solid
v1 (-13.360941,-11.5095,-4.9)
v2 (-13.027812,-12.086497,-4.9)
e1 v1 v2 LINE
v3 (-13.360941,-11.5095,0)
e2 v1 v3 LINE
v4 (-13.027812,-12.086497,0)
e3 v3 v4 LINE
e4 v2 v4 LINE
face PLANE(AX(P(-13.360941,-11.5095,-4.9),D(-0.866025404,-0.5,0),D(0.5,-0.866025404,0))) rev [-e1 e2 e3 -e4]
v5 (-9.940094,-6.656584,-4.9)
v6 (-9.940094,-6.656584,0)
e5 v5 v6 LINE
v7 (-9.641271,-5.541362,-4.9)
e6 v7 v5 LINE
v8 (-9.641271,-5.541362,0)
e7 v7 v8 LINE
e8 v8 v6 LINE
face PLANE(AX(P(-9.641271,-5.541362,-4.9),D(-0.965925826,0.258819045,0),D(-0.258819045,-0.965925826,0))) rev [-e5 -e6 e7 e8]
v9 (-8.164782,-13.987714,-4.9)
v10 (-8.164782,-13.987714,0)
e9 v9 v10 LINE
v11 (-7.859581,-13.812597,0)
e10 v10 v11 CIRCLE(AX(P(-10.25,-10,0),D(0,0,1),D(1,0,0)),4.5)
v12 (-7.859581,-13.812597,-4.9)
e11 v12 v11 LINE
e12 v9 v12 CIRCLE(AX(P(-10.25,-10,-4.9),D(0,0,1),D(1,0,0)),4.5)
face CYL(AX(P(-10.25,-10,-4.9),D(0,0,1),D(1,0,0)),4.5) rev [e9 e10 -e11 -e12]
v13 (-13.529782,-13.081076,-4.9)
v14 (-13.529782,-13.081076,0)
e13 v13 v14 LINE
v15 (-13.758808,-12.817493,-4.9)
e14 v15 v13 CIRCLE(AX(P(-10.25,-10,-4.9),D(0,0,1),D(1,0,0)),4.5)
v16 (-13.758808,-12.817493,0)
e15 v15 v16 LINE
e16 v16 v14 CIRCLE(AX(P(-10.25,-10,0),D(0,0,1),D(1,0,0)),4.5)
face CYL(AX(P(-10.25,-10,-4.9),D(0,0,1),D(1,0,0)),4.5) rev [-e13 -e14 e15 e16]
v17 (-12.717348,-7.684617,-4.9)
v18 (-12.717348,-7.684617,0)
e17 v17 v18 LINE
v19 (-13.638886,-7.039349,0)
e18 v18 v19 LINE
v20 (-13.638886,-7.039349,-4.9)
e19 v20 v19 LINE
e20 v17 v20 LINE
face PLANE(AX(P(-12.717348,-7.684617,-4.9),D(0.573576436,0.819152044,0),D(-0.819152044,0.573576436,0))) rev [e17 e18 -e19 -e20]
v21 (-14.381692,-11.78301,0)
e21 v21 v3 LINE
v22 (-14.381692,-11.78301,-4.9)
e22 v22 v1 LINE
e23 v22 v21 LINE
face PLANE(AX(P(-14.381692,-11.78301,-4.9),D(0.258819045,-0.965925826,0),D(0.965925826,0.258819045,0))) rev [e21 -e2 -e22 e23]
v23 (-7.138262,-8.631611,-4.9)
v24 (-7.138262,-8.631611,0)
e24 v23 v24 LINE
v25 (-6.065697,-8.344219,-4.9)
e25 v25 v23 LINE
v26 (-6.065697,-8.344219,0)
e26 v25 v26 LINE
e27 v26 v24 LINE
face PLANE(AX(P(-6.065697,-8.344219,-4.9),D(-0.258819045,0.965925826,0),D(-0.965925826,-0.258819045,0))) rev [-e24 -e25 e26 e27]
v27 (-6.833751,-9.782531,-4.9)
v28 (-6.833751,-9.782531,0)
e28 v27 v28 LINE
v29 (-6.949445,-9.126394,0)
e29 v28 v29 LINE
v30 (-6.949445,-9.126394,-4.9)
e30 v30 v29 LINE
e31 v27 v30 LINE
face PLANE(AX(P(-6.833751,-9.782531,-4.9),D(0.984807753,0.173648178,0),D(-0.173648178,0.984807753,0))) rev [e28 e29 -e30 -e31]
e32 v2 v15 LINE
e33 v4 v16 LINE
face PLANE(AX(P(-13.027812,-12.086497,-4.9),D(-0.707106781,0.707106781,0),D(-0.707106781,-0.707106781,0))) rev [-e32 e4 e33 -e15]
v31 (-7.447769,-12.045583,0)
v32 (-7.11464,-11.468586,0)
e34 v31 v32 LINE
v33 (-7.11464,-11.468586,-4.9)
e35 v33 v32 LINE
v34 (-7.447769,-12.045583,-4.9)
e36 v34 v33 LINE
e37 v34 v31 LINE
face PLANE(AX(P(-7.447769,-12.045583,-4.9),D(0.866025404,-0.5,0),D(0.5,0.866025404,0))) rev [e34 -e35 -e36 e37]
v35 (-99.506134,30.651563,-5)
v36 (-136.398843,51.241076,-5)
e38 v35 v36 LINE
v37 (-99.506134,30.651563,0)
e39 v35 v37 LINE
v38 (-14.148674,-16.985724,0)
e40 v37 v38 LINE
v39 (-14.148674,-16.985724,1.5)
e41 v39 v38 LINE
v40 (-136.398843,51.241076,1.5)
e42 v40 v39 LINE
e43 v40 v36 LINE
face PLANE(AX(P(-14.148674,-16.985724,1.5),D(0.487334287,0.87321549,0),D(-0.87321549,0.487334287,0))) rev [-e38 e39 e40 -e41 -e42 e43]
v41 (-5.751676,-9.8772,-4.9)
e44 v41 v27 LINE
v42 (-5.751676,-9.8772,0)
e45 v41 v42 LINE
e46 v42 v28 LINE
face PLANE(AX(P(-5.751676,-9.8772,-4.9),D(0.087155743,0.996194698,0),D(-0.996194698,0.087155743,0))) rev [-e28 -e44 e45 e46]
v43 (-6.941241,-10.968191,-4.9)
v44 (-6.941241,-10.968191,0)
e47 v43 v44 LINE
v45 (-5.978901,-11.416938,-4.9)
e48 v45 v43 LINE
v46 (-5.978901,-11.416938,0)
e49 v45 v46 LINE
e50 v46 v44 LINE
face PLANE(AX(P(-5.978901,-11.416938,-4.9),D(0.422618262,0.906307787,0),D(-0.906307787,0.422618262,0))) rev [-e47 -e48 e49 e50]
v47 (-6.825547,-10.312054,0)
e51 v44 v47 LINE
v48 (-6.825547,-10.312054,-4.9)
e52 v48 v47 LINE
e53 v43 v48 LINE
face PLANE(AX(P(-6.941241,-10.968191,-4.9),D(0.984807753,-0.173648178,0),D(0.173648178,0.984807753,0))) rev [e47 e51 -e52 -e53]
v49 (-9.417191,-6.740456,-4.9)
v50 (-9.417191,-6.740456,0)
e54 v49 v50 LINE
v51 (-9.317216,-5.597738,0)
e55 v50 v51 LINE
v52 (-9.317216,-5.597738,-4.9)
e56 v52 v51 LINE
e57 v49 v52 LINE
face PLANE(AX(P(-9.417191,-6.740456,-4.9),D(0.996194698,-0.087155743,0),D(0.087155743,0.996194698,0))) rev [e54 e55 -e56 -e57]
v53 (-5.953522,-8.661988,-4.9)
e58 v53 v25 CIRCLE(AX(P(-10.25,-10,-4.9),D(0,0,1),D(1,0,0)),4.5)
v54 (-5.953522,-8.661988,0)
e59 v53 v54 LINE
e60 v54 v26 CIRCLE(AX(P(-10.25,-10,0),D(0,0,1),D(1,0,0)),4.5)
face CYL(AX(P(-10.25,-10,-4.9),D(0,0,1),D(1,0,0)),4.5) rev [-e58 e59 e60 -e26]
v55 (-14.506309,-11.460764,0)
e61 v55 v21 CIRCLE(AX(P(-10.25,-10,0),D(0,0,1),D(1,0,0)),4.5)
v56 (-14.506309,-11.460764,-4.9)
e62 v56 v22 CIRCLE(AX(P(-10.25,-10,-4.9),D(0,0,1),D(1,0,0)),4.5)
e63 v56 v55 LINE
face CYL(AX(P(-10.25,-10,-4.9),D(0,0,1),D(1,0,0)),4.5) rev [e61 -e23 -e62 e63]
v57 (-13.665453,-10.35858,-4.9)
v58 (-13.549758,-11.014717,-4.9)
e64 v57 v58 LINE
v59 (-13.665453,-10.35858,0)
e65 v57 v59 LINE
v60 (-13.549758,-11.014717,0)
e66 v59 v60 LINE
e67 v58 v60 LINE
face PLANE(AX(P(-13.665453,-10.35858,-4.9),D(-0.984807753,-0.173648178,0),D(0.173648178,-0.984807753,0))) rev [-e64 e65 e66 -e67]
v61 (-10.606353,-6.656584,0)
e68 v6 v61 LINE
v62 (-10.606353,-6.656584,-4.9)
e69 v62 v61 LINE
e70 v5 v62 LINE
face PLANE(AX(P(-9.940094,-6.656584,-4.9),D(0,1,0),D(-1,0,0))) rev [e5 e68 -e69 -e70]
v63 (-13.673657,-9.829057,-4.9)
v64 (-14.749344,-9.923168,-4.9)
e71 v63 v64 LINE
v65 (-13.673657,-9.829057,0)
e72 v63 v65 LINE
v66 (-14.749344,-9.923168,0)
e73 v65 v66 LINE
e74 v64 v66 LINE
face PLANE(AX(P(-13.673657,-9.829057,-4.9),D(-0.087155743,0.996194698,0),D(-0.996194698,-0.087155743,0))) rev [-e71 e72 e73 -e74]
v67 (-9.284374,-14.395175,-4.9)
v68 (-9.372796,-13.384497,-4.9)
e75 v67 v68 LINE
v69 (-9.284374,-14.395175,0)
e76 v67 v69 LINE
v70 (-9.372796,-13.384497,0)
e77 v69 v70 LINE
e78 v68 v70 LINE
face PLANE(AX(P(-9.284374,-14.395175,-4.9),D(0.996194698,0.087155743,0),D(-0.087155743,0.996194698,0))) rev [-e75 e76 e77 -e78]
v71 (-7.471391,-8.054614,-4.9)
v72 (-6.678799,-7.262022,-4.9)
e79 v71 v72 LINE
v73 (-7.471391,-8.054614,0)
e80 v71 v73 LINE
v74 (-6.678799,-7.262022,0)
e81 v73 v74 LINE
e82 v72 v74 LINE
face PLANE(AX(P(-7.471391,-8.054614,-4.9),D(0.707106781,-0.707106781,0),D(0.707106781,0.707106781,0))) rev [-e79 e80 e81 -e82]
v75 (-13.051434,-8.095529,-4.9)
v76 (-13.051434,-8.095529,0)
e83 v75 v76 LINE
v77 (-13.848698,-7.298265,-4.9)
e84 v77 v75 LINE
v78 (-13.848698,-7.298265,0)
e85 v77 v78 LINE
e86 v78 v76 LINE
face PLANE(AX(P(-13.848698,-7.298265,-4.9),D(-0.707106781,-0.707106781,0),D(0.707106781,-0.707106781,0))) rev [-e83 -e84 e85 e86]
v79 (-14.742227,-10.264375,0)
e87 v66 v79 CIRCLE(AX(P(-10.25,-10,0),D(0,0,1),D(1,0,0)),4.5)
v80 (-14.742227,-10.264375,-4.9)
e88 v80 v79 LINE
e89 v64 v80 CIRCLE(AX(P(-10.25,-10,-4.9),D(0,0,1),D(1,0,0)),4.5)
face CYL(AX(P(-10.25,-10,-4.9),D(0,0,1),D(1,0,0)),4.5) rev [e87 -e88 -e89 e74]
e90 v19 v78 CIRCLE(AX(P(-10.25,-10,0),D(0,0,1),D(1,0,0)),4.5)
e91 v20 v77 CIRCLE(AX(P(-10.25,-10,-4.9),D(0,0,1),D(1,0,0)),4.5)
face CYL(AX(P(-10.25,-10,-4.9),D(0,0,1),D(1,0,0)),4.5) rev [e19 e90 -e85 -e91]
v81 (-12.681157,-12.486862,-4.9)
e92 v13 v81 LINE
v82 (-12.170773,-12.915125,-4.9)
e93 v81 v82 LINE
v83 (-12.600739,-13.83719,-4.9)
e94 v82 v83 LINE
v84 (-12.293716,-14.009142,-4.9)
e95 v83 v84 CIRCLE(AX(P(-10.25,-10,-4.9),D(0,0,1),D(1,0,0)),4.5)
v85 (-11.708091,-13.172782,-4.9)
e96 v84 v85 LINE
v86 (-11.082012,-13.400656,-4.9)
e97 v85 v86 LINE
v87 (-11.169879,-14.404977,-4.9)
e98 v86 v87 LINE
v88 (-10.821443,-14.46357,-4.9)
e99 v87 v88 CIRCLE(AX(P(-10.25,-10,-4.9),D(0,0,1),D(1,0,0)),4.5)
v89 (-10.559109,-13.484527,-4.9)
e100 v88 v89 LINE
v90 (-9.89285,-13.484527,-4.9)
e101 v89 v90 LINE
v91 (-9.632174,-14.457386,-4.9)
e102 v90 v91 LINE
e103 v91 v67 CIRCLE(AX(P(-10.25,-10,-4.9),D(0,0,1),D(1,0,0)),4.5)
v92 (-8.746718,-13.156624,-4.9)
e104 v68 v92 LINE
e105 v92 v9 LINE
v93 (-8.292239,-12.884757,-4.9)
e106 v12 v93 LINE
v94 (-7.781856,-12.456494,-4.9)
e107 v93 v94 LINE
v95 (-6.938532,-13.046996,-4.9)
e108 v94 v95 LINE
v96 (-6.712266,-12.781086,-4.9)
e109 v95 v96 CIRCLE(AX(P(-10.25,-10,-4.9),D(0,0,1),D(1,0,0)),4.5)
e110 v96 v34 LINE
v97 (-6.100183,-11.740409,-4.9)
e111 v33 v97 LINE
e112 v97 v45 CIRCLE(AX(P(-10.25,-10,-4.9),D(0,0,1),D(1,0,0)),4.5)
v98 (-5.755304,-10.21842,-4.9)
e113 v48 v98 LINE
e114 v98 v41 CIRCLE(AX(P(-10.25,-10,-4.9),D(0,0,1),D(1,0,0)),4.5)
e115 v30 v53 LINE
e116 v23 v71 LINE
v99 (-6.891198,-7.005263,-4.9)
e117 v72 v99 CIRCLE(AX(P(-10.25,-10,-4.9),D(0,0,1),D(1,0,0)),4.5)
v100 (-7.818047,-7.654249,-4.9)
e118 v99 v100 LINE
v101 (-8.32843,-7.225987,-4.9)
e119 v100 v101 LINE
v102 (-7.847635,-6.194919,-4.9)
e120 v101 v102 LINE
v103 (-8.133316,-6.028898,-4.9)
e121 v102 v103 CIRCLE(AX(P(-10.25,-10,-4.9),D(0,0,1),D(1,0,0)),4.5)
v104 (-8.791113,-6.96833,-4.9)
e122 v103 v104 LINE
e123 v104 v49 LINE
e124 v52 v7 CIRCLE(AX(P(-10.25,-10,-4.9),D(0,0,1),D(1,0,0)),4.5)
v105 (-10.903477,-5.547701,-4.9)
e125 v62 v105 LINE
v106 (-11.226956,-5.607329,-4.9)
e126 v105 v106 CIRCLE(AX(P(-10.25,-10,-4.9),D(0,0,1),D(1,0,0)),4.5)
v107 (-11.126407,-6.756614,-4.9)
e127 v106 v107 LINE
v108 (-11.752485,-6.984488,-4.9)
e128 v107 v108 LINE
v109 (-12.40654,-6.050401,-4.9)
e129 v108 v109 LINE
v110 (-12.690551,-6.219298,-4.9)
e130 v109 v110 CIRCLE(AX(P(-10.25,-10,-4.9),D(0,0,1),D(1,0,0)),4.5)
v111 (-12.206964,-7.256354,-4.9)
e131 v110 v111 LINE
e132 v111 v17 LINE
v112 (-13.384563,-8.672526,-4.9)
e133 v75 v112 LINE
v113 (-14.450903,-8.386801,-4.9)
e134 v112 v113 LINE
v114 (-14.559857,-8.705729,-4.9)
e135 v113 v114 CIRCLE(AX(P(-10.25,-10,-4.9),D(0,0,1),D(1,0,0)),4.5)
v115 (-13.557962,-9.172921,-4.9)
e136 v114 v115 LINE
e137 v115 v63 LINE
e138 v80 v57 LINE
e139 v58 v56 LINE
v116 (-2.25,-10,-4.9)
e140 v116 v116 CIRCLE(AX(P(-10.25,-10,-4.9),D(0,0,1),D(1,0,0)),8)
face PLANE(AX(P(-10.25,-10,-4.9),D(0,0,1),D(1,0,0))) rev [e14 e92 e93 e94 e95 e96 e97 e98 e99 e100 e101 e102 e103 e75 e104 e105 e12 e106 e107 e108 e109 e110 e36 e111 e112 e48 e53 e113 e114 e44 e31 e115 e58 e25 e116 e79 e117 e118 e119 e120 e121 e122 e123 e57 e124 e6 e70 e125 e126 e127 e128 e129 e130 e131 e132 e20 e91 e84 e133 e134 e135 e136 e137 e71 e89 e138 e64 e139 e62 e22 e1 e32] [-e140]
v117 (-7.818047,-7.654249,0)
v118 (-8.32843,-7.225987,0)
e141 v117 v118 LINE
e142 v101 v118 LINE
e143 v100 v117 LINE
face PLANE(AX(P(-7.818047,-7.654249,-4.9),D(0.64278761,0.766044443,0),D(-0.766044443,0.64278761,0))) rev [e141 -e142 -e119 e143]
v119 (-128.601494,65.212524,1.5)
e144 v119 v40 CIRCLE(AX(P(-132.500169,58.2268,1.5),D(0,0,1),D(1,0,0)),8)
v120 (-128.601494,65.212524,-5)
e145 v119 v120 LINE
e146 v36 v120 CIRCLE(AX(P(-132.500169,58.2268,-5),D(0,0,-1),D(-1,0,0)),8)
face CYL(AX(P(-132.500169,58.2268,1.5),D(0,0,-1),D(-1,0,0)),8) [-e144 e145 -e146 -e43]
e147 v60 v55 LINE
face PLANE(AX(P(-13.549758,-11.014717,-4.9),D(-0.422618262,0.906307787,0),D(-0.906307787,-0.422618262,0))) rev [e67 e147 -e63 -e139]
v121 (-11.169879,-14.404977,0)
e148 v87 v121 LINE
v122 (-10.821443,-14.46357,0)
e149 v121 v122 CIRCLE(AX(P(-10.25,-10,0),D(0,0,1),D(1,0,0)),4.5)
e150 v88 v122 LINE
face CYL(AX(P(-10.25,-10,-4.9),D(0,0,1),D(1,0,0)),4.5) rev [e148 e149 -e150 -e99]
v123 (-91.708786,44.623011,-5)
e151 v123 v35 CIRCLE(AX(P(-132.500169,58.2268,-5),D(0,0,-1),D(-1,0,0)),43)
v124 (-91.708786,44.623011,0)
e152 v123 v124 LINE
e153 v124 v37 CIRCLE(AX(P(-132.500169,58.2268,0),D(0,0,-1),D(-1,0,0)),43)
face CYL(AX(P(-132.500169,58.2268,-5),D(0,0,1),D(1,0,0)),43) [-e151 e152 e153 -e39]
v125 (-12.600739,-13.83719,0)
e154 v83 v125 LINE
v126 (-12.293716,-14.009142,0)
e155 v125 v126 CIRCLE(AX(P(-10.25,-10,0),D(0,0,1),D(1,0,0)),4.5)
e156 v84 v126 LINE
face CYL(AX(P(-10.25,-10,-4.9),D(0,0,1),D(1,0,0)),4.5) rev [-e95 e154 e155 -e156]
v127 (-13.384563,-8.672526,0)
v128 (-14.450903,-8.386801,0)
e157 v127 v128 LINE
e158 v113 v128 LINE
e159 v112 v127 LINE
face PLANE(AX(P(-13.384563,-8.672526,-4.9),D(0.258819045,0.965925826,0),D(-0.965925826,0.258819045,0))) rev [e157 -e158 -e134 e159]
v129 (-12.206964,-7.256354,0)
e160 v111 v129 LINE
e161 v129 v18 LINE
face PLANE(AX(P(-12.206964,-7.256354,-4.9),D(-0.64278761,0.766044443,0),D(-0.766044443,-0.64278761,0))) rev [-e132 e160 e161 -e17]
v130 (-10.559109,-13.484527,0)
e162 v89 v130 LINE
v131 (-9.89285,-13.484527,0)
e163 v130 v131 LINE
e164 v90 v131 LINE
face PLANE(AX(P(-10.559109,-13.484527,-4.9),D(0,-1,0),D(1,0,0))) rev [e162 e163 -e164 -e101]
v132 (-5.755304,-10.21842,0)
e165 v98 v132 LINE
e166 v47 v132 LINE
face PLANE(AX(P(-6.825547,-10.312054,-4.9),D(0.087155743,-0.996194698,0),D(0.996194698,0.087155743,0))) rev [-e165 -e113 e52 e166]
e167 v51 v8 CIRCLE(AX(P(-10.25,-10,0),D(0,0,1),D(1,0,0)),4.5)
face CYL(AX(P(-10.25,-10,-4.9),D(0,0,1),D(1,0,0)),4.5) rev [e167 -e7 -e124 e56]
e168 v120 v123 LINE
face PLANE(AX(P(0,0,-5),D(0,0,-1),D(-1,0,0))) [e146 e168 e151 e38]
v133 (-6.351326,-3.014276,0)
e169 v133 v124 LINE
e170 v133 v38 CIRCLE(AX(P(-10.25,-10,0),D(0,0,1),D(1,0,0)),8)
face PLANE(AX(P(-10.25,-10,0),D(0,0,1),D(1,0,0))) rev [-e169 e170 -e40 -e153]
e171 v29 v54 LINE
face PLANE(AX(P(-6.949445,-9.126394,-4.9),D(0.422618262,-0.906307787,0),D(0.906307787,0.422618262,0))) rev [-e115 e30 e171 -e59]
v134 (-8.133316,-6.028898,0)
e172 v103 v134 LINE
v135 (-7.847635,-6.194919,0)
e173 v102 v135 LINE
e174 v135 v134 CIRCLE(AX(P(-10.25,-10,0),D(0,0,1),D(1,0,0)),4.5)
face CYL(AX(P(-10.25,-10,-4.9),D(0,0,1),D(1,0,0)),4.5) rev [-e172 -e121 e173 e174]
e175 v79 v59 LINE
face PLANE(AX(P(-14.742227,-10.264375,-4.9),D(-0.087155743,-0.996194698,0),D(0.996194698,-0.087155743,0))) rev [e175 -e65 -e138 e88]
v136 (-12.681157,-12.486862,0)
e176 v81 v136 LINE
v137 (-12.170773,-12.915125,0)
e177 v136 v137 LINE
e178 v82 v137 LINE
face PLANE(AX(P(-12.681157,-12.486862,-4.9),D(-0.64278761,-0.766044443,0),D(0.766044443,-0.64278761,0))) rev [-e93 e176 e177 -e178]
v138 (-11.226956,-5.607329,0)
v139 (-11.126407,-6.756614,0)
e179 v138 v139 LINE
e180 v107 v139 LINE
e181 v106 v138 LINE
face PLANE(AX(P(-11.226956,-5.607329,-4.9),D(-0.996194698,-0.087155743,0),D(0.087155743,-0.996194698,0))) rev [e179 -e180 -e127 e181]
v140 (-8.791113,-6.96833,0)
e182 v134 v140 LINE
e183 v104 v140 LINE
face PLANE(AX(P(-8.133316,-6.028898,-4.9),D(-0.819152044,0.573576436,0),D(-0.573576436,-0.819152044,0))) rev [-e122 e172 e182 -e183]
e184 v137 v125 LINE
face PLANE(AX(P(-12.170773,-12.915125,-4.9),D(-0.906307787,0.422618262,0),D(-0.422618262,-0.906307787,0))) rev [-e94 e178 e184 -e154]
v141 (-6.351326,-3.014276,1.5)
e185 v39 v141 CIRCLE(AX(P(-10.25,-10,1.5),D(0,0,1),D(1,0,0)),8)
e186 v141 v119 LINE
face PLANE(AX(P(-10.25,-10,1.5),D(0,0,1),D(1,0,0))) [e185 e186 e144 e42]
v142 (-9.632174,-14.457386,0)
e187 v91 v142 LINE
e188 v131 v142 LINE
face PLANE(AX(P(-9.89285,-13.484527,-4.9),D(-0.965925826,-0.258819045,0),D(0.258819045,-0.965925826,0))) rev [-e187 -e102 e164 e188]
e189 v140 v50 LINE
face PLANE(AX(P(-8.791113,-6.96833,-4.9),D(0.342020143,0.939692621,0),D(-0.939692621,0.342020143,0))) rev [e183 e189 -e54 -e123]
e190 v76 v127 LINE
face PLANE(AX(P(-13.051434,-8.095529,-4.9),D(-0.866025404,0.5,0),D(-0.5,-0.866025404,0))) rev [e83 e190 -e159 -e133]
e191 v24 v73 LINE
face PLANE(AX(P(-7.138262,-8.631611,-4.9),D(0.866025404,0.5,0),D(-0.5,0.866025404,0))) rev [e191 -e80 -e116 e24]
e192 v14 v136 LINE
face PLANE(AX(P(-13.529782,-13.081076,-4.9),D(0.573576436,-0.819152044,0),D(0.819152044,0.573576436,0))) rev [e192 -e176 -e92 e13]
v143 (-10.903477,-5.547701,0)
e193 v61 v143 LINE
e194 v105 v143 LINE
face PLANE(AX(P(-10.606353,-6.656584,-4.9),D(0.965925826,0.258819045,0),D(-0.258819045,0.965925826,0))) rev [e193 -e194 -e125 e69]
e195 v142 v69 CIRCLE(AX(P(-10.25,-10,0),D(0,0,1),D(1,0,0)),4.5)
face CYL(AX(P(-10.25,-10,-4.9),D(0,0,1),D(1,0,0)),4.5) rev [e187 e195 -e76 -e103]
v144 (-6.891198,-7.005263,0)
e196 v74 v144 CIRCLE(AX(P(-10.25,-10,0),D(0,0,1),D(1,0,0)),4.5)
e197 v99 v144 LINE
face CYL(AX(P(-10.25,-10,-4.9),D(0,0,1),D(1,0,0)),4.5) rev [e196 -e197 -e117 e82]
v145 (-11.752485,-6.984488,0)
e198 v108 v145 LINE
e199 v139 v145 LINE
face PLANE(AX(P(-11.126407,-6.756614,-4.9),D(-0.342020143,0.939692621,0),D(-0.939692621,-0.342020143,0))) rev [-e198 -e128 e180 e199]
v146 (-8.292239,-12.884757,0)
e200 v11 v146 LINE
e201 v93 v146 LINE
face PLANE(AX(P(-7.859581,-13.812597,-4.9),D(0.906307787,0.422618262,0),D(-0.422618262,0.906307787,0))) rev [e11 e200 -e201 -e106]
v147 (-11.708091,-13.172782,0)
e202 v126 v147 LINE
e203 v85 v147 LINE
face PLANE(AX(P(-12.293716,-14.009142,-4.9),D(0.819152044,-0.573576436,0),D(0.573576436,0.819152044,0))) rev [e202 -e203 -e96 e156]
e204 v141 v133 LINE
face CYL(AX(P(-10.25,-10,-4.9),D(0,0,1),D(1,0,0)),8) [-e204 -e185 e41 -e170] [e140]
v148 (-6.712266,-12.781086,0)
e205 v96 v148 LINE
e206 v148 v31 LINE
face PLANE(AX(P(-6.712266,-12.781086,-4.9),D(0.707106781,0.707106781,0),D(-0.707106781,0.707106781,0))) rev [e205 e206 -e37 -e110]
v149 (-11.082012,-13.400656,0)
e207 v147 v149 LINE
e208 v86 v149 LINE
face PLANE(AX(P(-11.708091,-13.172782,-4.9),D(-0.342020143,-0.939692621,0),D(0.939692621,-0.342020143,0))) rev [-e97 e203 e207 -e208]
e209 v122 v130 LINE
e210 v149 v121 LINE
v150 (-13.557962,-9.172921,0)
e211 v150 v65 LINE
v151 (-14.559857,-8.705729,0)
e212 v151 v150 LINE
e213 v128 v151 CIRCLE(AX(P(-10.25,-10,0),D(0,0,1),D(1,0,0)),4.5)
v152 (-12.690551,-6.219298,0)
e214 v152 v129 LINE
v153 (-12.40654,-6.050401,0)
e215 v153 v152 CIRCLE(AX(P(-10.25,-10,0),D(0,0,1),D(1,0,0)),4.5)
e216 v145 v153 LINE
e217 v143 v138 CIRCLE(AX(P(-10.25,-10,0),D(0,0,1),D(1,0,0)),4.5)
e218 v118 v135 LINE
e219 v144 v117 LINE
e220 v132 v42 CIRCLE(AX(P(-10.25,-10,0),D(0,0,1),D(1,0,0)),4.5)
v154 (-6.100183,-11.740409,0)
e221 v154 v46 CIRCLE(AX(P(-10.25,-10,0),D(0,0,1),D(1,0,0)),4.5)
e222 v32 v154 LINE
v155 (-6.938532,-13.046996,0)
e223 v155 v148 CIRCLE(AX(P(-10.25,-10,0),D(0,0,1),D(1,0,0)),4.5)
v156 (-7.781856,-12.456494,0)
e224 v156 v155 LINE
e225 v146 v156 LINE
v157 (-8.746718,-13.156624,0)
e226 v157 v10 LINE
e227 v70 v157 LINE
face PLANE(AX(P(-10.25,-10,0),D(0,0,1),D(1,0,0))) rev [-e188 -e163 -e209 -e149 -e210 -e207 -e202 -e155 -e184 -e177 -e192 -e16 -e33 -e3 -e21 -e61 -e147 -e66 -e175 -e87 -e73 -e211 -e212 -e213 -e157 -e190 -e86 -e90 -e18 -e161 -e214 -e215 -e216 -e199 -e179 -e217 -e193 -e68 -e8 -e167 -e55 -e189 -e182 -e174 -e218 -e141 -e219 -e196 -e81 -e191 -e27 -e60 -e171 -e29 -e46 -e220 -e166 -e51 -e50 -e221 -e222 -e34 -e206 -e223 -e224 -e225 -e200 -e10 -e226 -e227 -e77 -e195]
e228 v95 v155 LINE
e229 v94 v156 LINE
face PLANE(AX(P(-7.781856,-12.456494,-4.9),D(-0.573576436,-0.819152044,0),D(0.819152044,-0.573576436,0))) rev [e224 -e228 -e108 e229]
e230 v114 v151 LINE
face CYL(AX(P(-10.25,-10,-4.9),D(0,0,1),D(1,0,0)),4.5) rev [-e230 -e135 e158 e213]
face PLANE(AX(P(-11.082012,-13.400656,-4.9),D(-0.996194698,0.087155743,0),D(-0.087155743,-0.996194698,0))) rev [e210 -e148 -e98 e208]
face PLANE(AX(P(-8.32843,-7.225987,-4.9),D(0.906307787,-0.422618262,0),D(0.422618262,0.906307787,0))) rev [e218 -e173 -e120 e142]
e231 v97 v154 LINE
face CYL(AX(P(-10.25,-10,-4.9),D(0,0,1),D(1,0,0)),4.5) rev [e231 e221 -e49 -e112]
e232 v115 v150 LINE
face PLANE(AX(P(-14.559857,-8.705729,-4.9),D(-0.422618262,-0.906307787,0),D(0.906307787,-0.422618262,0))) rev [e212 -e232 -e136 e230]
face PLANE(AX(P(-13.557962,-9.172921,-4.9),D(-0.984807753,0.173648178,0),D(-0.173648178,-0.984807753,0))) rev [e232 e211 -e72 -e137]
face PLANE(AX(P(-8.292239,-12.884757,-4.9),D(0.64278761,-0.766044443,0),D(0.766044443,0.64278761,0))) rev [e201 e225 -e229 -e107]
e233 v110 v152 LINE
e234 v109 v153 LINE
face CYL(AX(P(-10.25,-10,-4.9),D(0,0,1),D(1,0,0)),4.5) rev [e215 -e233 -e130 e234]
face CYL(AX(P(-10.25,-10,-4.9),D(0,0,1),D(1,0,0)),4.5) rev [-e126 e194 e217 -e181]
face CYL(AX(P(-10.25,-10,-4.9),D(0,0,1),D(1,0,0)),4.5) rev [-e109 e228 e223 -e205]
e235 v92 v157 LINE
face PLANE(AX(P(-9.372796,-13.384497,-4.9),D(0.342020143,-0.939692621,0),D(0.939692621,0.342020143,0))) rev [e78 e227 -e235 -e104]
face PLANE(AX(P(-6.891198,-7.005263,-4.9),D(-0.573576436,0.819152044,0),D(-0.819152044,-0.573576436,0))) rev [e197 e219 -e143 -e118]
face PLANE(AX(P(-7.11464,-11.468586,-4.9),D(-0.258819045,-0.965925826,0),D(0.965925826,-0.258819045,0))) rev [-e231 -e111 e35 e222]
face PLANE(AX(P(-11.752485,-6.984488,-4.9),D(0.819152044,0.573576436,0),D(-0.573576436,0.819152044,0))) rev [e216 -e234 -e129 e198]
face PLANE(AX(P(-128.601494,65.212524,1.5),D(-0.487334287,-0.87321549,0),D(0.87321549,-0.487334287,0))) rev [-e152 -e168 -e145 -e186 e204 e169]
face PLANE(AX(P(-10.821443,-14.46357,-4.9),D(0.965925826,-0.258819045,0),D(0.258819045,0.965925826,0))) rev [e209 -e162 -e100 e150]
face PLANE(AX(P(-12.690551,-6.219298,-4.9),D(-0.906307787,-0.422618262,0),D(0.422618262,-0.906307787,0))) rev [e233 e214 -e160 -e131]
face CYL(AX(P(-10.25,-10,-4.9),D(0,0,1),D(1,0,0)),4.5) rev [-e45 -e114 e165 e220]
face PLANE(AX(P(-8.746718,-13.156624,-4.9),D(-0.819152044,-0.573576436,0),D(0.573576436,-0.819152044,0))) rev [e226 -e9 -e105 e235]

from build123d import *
from build123d.topology import SkipClean

# Parameters (mm, degrees)
ESQUISSE1_R        = 8
BOSS_EXTRU_1_DEPTH = 4.9
BOSS_EXTRU_2_START = 1.5
BOSS_EXTRU_2_DEPTH = 1.5
BOSS_EXTRU_3_DEPTH = 5


with BuildPart() as part:
    # Esquisse1 → Boss.-Extru.1 (new body)
    with BuildSketch(Plane.XY):
        with Locations((-10.25, -10)):
            Circle(ESQUISSE1_R)
        with BuildLine():
            Line((-5.751675839, -9.877200395), (-6.833750507, -9.782531128))
            Line((-6.833750507, -9.782531128), (-6.949445107, -9.126394451))
            Line((-6.949445107, -9.126394451), (-5.953521963, -8.661987862))
            ThreePointArc((-5.953521963, -8.661987862), (-6.006634107, -8.502052772), (-6.065697468, -8.344218516))
            Line((-6.065697468, -8.344218516), (-7.138261768, -8.631611254))
            Line((-7.138261768, -8.631611254), (-7.47139109, -8.054614344))
            Line((-7.47139109, -8.054614344), (-6.678798898, -7.262022153))
            ThreePointArc((-6.678798898, -7.262022153), (-6.782621037, -7.131675902), (-6.891198054, -7.005263035))
            Line((-6.891198054, -7.005263035), (-7.818046533, -7.654249327))
            Line((-7.818046533, -7.654249327), (-8.328430264, -7.225986526))
            Line((-8.328430264, -7.225986526), (-7.847635402, -6.194918616))
            ThreePointArc((-7.847635402, -6.194918616), (-7.988951343, -6.109285545), (-8.133315872, -6.028898352))
            Line((-8.133315872, -6.028898352), (-8.791112727, -6.968329619))
            Line((-8.791112727, -6.968329619), (-9.417191057, -6.740455742))
            Line((-9.417191057, -6.740455742), (-9.317216173, -5.597737589))
            ThreePointArc((-9.317216173, -5.597737589), (-9.478728542, -5.566588183), (-9.641271425, -5.541362369))
            Line((-9.641271425, -5.541362369), (-9.940094206, -6.656584169))
            Line((-9.940094206, -6.656584169), (-10.606352849, -6.656584169))
            Line((-10.606352849, -6.656584169), (-10.903477232, -5.547700874))
            ThreePointArc((-10.903477232, -5.547700874), (-11.065761738, -5.574558464), (-11.226956242, -5.607329229))
            Line((-11.226956242, -5.607329229), (-11.126406846, -6.756614081))
            Line((-11.126406846, -6.756614081), (-11.752485176, -6.984487958))
            Line((-11.752485176, -6.984487958), (-12.406540122, -6.050400691))
            ThreePointArc((-12.406540122, -6.050400691), (-12.550096477, -6.132241451), (-12.690551241, -6.219297732))
            Line((-12.690551241, -6.219297732), (-12.206963835, -7.256354271))
            Line((-12.206963835, -7.256354271), (-12.717347566, -7.684617071))
            Line((-12.717347566, -7.684617071), (-13.638885709, -7.039349117))
            ThreePointArc((-13.638885709, -7.039349117), (-13.74618945, -7.166864047), (-13.848697947, -7.298264801))
            Line((-13.848697947, -7.298264801), (-13.051434053, -8.095528695))
            Line((-13.051434053, -8.095528695), (-13.384563375, -8.672525605))
            Line((-13.384563375, -8.672525605), (-14.450903238, -8.3868007))
            ThreePointArc((-14.450903238, -8.3868007), (-14.508366703, -8.545244687), (-14.559856563, -8.705729393))
            Line((-14.559856563, -8.705729393), (-13.557961929, -9.172920534))
            Line((-13.557961929, -9.172920534), (-13.673656528, -9.829057211))
            Line((-13.673656528, -9.829057211), (-14.74934404, -9.923167674))
            ThreePointArc((-14.74934404, -9.923167674), (-14.749021481, -10.093838761), (-14.74222728, -10.264374865))
            Line((-14.74222728, -10.264374865), (-13.665452724, -10.358580432))
            Line((-13.665452724, -10.358580432), (-13.549758125, -11.014717109))
            Line((-13.549758125, -11.014717109), (-14.506309194, -11.460764198))
            ThreePointArc((-14.506309194, -11.460764198), (-14.447094307, -11.623083293), (-14.381691786, -11.78300953))
            Line((-14.381691786, -11.78300953), (-13.360941463, -11.509500306))
            Line((-13.360941463, -11.509500306), (-13.027812142, -12.086497216))
            Line((-13.027812142, -12.086497216), (-13.758807936, -12.817493011))
            ThreePointArc((-13.758807936, -12.817493011), (-13.646852578, -12.951506829), (-13.529782028, -13.081076086))
            Line((-13.529782028, -13.081076086), (-12.681156698, -12.486862233))
            Line((-12.681156698, -12.486862233), (-12.170772967, -12.915125033))
            Line((-12.170772967, -12.915125033), (-12.600738895, -13.837189942))
            ThreePointArc((-12.600738895, -13.837189942), (-12.448909121, -13.926168447), (-12.293716433, -14.009142444))
            Line((-12.293716433, -14.009142444), (-11.708090504, -13.172781941))
            Line((-11.708090504, -13.172781941), (-11.082012174, -13.400655818))
            Line((-11.082012174, -13.400655818), (-11.169878896, -14.404977051))
            ThreePointArc((-11.169878896, -14.404977051), (-10.996236031, -14.437694422), (-10.821442589, -14.463569577))
            Line((-10.821442589, -14.463569577), (-10.559109026, -13.48452739))
            Line((-10.559109026, -13.48452739), (-9.892850383, -13.48452739))
            Line((-9.892850383, -13.48452739), (-9.632173683, -14.457386077))
            ThreePointArc((-9.632173683, -14.457386077), (-9.45766281, -14.42969545), (-9.284373537, -14.395175256))
            Line((-9.284373537, -14.395175256), (-9.372796385, -13.384497479))
            Line((-9.372796385, -13.384497479), (-8.746718055, -13.156623602))
            Line((-8.746718055, -13.156623602), (-8.164782025, -13.987714383))
            ThreePointArc((-8.164782025, -13.987714383), (-8.010469052, -13.903139907), (-7.859580663, -13.812596936))
            Line((-7.859580663, -13.812596936), (-8.292239396, -12.884757289))
            Line((-8.292239396, -12.884757289), (-7.781855665, -12.456494489))
            Line((-7.781855665, -12.456494489), (-6.938532496, -13.046995729))
            ThreePointArc((-6.938532496, -13.046995729), (-6.822819391, -12.916236114), (-6.712266113, -12.78108593))
            Line((-6.712266113, -12.78108593), (-7.447769178, -12.045582865))
            Line((-7.447769178, -12.045582865), (-7.114639857, -11.468585954))
            Line((-7.114639857, -11.468585954), (-6.100183444, -11.740408731))
            ThreePointArc((-6.100183444, -11.740408731), (-6.036436962, -11.579837499), (-5.978900904, -11.416937723))
            Line((-5.978900904, -11.416937723), (-6.941241303, -10.968191026))
            Line((-6.941241303, -10.968191026), (-6.825546704, -10.312054348))
            Line((-6.825546704, -10.312054348), (-5.755303948, -10.21842024))
            ThreePointArc((-5.755303948, -10.21842024), (-5.750254354, -10.04784472), (-5.751675839, -9.877200395))
        make_face(mode=Mode.SUBTRACT)
    extrude(amount=-BOSS_EXTRU_1_DEPTH)

    # Esquisse2 → Boss.-Extru.2 (add)
    with SkipClean():  # the faces are left unmerged after this step: merging them gives an invalid solid
        with BuildSketch(Plane.XY.offset(BOSS_EXTRU_2_START)):
            with BuildLine():
                Line((-14.148674299, -16.985723922), (-136.398842928, 51.241076313))
                ThreePointArc((-136.398842928, 51.241076313), (-139.48589255, 62.125474534), (-128.601494329, 65.212524157))
                Line((-128.601494329, 65.212524157), (-6.351325701, -3.014276078))
                ThreePointArc((-6.351325701, -3.014276078), (-3.264276078, -13.898674299), (-14.148674299, -16.985723922))
            make_face()
        extrude(amount=-BOSS_EXTRU_2_DEPTH)
    add(part.part.scale(1), mode=Mode.REPLACE)  # the faces are merged on a copy

    # Esquisse3 → Boss.-Extru.3 (add)
    with BuildSketch(Plane(origin=(0, 0, 0), x_dir=(-1, 0, 0), z_dir=(0, 0, -1))):
        with BuildLine():
            ThreePointArc((136.398842928, 51.241076313), (139.48589255, 62.125474534), (128.601494329, 65.212524157))
            Line((128.601494329, 65.212524157), (91.708785743, 44.623010972))
            ThreePointArc((91.708785743, 44.623010972), (94.95190255, 37.271425877), (99.506134342, 30.651563128))
            Line((99.506134342, 30.651563128), (136.398842928, 51.241076313))
        make_face()
    extrude(amount=BOSS_EXTRU_3_DEPTH)


solid = part.part
